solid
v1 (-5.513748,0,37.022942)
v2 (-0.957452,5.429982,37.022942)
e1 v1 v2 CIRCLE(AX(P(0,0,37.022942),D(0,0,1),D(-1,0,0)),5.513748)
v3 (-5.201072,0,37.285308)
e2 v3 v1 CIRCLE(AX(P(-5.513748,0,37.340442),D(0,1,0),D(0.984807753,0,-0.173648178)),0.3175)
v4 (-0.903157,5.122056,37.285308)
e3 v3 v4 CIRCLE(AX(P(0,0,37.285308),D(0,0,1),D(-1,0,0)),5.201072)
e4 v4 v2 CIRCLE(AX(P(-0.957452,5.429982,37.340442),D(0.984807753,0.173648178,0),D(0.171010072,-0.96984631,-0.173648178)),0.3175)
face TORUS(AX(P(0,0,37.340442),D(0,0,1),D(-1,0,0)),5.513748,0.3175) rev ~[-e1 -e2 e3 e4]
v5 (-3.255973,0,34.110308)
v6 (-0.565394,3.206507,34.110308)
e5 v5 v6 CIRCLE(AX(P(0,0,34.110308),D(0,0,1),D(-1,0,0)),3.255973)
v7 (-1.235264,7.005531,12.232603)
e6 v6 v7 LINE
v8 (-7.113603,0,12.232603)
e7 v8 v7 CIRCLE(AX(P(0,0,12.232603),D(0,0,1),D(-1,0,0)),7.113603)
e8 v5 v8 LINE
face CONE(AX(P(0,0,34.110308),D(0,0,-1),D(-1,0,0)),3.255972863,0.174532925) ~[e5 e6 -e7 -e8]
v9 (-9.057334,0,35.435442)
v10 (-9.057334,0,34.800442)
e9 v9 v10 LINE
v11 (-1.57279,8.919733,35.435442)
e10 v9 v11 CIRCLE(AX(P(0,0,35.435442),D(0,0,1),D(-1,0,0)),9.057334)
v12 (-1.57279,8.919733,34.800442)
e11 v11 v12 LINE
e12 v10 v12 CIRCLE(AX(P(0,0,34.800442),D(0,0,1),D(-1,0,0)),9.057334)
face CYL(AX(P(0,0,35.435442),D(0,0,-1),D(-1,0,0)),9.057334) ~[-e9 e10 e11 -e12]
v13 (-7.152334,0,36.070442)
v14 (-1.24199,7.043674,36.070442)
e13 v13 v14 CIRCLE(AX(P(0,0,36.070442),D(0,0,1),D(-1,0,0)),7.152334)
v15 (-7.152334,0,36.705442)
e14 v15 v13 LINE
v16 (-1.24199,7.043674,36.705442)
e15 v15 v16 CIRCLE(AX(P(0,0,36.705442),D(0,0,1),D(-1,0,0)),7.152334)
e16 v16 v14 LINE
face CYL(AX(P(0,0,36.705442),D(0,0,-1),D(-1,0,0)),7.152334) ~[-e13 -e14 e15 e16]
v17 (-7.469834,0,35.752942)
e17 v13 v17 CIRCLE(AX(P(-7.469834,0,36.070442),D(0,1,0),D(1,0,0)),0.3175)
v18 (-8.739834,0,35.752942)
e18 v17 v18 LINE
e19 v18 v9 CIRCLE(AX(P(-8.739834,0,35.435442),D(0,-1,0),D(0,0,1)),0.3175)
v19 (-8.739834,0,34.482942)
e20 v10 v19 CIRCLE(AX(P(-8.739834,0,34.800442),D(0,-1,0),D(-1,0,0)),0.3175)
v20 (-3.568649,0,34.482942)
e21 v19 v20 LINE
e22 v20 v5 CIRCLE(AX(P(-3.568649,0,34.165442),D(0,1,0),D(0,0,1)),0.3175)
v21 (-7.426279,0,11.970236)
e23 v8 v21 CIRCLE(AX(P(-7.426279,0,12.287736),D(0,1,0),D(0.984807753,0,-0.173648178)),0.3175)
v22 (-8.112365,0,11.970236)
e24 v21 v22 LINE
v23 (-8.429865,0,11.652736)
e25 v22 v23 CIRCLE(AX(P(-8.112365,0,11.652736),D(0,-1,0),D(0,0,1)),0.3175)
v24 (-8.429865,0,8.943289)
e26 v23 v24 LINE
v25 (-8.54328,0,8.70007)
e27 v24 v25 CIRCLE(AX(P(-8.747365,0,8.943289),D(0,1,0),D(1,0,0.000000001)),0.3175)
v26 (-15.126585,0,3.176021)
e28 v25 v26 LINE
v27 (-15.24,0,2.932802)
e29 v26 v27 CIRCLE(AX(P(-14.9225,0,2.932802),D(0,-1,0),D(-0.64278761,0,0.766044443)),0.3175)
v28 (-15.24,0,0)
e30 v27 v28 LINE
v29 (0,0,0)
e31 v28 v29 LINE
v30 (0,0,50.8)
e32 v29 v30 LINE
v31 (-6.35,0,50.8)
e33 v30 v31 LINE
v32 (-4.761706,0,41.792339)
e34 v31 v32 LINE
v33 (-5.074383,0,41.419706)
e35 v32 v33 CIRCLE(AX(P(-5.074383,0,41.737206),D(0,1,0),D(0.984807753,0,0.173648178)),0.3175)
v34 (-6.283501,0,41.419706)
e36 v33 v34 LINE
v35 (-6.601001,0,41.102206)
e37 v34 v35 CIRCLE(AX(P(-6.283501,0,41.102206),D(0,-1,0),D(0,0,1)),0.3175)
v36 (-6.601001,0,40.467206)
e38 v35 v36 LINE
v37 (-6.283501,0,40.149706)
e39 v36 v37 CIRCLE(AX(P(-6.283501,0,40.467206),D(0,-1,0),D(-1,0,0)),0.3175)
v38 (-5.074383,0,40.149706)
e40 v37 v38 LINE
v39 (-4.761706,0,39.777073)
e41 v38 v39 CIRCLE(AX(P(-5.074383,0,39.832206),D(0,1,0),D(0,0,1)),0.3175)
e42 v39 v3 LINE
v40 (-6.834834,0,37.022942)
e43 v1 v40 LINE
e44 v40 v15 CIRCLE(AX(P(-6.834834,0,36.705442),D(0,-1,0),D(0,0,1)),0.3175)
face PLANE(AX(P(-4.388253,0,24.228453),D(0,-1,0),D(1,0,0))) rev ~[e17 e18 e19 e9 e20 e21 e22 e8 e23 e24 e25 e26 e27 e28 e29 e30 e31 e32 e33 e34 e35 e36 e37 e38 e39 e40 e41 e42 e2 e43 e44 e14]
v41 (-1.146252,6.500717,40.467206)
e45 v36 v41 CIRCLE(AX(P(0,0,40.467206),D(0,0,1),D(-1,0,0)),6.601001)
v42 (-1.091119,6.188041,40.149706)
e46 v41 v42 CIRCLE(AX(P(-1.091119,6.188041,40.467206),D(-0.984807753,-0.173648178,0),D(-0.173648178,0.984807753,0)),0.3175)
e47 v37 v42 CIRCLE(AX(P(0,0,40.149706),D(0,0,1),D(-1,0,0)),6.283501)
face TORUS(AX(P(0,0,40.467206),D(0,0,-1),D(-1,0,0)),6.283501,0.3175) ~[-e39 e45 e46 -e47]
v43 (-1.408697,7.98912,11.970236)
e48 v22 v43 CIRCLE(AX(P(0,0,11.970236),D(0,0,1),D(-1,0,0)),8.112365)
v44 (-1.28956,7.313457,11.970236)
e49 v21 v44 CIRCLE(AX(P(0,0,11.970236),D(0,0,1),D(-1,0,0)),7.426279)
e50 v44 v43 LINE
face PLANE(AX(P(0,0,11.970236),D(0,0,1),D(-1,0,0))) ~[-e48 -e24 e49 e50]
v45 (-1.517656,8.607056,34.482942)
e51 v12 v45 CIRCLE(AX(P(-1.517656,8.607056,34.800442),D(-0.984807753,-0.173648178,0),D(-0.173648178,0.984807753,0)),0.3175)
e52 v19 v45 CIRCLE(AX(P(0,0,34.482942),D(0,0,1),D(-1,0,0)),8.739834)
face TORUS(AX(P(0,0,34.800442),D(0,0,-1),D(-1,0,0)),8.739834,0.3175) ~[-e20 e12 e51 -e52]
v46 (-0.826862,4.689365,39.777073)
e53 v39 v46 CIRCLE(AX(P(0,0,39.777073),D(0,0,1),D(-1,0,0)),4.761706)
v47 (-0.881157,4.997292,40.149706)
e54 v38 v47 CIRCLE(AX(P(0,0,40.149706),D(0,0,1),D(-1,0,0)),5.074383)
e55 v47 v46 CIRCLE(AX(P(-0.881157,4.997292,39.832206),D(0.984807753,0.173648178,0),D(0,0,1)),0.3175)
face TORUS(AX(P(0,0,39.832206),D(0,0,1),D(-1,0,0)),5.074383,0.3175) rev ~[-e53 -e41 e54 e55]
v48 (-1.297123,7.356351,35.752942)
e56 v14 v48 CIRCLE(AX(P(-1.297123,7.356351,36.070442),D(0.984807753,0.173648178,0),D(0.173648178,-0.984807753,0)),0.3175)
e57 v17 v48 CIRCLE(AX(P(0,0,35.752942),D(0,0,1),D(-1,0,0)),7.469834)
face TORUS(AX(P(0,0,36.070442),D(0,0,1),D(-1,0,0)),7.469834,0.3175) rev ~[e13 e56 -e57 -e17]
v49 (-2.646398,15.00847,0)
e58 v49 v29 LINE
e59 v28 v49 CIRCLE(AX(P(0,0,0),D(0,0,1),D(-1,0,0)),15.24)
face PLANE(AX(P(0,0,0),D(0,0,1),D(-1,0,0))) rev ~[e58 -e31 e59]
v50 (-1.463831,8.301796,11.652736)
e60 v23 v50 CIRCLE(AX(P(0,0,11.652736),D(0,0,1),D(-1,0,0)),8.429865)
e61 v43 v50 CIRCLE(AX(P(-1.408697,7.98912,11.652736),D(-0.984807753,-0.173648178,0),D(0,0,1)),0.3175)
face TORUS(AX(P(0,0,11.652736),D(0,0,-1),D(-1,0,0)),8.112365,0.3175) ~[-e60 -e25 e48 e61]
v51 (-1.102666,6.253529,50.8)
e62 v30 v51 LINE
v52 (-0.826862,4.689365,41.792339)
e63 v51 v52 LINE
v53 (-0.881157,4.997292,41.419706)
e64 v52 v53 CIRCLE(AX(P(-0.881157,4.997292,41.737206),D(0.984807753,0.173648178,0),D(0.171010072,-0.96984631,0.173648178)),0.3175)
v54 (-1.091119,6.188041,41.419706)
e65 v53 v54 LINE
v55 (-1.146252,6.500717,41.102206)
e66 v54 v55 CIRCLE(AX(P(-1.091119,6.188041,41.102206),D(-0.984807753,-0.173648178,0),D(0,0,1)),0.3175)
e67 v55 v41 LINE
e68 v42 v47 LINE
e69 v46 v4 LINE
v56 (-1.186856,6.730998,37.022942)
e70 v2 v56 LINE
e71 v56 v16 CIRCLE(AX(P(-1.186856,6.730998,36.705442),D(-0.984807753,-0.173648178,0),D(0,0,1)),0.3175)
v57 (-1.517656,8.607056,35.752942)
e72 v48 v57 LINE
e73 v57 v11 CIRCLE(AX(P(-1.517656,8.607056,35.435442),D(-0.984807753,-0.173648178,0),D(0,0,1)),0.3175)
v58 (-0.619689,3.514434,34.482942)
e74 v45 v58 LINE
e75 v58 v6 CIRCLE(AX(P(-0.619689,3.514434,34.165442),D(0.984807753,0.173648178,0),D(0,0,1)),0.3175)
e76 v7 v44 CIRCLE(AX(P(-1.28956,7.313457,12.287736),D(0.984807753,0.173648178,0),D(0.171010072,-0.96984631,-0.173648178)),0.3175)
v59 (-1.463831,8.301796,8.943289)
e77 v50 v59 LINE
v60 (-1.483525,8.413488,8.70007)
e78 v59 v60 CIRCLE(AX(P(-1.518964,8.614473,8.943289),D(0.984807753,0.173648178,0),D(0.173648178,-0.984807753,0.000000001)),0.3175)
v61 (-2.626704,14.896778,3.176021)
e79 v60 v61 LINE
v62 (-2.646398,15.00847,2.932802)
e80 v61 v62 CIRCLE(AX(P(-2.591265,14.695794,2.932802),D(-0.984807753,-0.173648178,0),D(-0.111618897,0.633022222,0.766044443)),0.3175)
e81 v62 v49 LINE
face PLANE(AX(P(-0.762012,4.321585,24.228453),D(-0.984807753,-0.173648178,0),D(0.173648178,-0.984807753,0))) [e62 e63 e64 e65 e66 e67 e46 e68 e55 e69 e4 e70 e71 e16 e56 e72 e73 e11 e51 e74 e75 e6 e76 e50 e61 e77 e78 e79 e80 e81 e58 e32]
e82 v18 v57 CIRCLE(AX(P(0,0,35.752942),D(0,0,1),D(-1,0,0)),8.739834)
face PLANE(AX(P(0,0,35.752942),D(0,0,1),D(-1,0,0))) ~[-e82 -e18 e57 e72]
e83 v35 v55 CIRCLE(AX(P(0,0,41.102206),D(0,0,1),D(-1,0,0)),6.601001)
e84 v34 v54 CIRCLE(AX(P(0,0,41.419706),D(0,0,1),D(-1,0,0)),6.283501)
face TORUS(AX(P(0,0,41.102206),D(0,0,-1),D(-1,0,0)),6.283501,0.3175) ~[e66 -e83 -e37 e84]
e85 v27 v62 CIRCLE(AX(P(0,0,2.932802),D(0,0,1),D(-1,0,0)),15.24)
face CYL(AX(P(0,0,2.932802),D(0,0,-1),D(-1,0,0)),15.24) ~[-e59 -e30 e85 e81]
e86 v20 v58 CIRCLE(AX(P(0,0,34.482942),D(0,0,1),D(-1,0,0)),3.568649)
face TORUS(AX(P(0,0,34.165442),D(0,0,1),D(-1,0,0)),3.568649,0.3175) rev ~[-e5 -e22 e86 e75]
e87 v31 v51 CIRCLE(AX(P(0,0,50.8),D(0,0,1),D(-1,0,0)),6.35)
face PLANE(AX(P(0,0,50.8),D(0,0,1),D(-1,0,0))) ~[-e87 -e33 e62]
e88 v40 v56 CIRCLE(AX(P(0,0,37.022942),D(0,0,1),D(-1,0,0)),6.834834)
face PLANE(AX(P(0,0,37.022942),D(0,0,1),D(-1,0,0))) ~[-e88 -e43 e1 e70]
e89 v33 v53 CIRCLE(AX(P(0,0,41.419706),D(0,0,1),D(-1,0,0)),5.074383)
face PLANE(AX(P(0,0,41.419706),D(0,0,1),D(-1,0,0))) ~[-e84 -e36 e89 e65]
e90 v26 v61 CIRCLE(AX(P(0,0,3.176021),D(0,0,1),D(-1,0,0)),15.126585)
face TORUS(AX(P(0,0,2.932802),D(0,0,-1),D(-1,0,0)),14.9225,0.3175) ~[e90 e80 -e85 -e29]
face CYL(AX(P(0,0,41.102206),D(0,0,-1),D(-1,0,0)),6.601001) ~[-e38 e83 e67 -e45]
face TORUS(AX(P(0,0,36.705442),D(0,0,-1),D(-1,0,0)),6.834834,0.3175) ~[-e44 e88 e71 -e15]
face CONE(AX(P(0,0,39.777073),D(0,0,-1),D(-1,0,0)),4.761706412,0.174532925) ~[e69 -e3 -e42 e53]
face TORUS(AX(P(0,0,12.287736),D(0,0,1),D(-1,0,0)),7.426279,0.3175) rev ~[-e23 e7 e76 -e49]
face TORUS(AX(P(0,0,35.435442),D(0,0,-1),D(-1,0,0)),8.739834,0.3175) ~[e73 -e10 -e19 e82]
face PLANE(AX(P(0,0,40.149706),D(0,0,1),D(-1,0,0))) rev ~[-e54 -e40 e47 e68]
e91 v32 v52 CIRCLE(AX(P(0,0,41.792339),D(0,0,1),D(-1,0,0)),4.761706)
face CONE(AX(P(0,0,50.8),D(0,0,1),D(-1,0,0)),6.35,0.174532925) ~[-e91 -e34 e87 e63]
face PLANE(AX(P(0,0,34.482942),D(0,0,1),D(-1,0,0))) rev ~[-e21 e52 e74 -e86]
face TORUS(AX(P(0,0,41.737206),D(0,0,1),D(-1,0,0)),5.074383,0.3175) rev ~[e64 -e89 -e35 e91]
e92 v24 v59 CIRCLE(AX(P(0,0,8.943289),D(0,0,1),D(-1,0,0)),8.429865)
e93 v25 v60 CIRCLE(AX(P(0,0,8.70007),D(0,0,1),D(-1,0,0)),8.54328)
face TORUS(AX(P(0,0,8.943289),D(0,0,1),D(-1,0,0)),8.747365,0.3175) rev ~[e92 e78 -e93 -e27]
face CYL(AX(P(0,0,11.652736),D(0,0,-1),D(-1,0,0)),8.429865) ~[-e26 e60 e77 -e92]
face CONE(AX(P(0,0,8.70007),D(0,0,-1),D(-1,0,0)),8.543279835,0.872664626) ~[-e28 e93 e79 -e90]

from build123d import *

# Parameters (mm, degrees)
F1_ANGLE = 280


# Not quite as in the source:
# - a feature of the source that left no trace in its solid (it failed there, or was rolled back) is left out


with BuildPart() as f1:
    # F0 (on Front) → F1 (revolve)
    with BuildSketch(Plane.XZ):
        with BuildLine():
            Line((-15.24, 0), (0, 0))
            Line((0, 0), (0, 50.8))
            Line((0, 50.8), (-6.35, 50.8))
            Line((-6.35, 50.8), (-4.7617064118, 41.792339449))
            ThreePointArc((-4.7617064118, 41.792339449), (-4.8311637627, 41.5331210865), (-5.0743828734, 41.4197061526))
            Line((-5.0743828734, 41.4197061526), (-6.2835011077, 41.4197061526))
            ThreePointArc((-6.2835011077, 41.4197061526), (-6.5080075107, 41.3267125556), (-6.6010011077, 41.1022061526))
            Line((-6.6010011077, 41.1022061526), (-6.6010011077, 40.4672061526))
            ThreePointArc((-6.6010011077, 40.4672061526), (-6.5080075107, 40.2426997495), (-6.2835011077, 40.1497061526))
            Line((-6.2835011077, 40.1497061526), (-5.0743828734, 40.1497061526))
            ThreePointArc((-5.0743828734, 40.1497061526), (-4.8311637627, 40.0362912186), (-4.7617064118, 39.7770728561))
            Line((-4.7617064118, 39.7770728561), (-5.2010717431, 37.2853082403))
            ThreePointArc((-5.2010717431, 37.2853082403), (-5.3096631386, 37.0972224261), (-5.5137482047, 37.0229415367))
            Line((-5.5137482047, 37.0229415367), (-6.8348340718, 37.0229415367))
            ThreePointArc((-6.8348340718, 37.0229415367), (-7.0593404748, 36.9299479398), (-7.1523340718, 36.7054415367))
            Line((-7.1523340718, 36.7054415367), (-7.1523340718, 36.0704415367))
            ThreePointArc((-7.1523340718, 36.0704415367), (-7.2453276688, 35.8459351337), (-7.4698340718, 35.7529415367))
            Line((-7.4698340718, 35.7529415367), (-8.7398340718, 35.7529415367))
            ThreePointArc((-8.7398340718, 35.7529415367), (-8.9643404748, 35.6599479398), (-9.0573340718, 35.4354415367))
            Line((-9.0573340718, 35.4354415367), (-9.0573340718, 34.8004415367))
            ThreePointArc((-9.0573340718, 34.8004415367), (-8.9643404748, 34.5759351337), (-8.7398340718, 34.4829415367))
            Line((-8.7398340718, 34.4829415367), (-3.5686493249, 34.4829415367))
            ThreePointArc((-3.5686493249, 34.4829415367), (-3.3254302142, 34.3695266028), (-3.2559728633, 34.1103082403))
            Line((-3.2559728633, 34.1103082403), (-7.113602572, 12.2326030065))
            ThreePointArc((-7.113602572, 12.2326030065), (-7.2221939675, 12.0445171922), (-7.4262790336, 11.9702363029))
            Line((-7.4262790336, 11.9702363029), (-8.1123649007, 11.9702363029))
            ThreePointArc((-8.1123649007, 11.9702363029), (-8.3368713037, 11.8772427059), (-8.4298649007, 11.6527363029))
            Line((-8.4298649007, 11.6527363029), (-8.4298649007, 8.9432889844))
            ThreePointArc((-8.4298649007, 8.9432889844), (-8.4596121783, 8.8091076862), (-8.5432798346, 8.7000698737))
            Line((-8.5432798346, 8.7000698737), (-15.1265850661, 3.176020882))
            ThreePointArc((-15.1265850661, 3.176020882), (-15.2102527224, 3.0669830694), (-15.24, 2.9328017713))
            Line((-15.24, 2.9328017713), (-15.24, 0))
        make_face()
    revolve(axis=Axis((0, 0, 25.4), (0, 0, 1)), revolution_arc=F1_ANGLE)


solid = f1.part
